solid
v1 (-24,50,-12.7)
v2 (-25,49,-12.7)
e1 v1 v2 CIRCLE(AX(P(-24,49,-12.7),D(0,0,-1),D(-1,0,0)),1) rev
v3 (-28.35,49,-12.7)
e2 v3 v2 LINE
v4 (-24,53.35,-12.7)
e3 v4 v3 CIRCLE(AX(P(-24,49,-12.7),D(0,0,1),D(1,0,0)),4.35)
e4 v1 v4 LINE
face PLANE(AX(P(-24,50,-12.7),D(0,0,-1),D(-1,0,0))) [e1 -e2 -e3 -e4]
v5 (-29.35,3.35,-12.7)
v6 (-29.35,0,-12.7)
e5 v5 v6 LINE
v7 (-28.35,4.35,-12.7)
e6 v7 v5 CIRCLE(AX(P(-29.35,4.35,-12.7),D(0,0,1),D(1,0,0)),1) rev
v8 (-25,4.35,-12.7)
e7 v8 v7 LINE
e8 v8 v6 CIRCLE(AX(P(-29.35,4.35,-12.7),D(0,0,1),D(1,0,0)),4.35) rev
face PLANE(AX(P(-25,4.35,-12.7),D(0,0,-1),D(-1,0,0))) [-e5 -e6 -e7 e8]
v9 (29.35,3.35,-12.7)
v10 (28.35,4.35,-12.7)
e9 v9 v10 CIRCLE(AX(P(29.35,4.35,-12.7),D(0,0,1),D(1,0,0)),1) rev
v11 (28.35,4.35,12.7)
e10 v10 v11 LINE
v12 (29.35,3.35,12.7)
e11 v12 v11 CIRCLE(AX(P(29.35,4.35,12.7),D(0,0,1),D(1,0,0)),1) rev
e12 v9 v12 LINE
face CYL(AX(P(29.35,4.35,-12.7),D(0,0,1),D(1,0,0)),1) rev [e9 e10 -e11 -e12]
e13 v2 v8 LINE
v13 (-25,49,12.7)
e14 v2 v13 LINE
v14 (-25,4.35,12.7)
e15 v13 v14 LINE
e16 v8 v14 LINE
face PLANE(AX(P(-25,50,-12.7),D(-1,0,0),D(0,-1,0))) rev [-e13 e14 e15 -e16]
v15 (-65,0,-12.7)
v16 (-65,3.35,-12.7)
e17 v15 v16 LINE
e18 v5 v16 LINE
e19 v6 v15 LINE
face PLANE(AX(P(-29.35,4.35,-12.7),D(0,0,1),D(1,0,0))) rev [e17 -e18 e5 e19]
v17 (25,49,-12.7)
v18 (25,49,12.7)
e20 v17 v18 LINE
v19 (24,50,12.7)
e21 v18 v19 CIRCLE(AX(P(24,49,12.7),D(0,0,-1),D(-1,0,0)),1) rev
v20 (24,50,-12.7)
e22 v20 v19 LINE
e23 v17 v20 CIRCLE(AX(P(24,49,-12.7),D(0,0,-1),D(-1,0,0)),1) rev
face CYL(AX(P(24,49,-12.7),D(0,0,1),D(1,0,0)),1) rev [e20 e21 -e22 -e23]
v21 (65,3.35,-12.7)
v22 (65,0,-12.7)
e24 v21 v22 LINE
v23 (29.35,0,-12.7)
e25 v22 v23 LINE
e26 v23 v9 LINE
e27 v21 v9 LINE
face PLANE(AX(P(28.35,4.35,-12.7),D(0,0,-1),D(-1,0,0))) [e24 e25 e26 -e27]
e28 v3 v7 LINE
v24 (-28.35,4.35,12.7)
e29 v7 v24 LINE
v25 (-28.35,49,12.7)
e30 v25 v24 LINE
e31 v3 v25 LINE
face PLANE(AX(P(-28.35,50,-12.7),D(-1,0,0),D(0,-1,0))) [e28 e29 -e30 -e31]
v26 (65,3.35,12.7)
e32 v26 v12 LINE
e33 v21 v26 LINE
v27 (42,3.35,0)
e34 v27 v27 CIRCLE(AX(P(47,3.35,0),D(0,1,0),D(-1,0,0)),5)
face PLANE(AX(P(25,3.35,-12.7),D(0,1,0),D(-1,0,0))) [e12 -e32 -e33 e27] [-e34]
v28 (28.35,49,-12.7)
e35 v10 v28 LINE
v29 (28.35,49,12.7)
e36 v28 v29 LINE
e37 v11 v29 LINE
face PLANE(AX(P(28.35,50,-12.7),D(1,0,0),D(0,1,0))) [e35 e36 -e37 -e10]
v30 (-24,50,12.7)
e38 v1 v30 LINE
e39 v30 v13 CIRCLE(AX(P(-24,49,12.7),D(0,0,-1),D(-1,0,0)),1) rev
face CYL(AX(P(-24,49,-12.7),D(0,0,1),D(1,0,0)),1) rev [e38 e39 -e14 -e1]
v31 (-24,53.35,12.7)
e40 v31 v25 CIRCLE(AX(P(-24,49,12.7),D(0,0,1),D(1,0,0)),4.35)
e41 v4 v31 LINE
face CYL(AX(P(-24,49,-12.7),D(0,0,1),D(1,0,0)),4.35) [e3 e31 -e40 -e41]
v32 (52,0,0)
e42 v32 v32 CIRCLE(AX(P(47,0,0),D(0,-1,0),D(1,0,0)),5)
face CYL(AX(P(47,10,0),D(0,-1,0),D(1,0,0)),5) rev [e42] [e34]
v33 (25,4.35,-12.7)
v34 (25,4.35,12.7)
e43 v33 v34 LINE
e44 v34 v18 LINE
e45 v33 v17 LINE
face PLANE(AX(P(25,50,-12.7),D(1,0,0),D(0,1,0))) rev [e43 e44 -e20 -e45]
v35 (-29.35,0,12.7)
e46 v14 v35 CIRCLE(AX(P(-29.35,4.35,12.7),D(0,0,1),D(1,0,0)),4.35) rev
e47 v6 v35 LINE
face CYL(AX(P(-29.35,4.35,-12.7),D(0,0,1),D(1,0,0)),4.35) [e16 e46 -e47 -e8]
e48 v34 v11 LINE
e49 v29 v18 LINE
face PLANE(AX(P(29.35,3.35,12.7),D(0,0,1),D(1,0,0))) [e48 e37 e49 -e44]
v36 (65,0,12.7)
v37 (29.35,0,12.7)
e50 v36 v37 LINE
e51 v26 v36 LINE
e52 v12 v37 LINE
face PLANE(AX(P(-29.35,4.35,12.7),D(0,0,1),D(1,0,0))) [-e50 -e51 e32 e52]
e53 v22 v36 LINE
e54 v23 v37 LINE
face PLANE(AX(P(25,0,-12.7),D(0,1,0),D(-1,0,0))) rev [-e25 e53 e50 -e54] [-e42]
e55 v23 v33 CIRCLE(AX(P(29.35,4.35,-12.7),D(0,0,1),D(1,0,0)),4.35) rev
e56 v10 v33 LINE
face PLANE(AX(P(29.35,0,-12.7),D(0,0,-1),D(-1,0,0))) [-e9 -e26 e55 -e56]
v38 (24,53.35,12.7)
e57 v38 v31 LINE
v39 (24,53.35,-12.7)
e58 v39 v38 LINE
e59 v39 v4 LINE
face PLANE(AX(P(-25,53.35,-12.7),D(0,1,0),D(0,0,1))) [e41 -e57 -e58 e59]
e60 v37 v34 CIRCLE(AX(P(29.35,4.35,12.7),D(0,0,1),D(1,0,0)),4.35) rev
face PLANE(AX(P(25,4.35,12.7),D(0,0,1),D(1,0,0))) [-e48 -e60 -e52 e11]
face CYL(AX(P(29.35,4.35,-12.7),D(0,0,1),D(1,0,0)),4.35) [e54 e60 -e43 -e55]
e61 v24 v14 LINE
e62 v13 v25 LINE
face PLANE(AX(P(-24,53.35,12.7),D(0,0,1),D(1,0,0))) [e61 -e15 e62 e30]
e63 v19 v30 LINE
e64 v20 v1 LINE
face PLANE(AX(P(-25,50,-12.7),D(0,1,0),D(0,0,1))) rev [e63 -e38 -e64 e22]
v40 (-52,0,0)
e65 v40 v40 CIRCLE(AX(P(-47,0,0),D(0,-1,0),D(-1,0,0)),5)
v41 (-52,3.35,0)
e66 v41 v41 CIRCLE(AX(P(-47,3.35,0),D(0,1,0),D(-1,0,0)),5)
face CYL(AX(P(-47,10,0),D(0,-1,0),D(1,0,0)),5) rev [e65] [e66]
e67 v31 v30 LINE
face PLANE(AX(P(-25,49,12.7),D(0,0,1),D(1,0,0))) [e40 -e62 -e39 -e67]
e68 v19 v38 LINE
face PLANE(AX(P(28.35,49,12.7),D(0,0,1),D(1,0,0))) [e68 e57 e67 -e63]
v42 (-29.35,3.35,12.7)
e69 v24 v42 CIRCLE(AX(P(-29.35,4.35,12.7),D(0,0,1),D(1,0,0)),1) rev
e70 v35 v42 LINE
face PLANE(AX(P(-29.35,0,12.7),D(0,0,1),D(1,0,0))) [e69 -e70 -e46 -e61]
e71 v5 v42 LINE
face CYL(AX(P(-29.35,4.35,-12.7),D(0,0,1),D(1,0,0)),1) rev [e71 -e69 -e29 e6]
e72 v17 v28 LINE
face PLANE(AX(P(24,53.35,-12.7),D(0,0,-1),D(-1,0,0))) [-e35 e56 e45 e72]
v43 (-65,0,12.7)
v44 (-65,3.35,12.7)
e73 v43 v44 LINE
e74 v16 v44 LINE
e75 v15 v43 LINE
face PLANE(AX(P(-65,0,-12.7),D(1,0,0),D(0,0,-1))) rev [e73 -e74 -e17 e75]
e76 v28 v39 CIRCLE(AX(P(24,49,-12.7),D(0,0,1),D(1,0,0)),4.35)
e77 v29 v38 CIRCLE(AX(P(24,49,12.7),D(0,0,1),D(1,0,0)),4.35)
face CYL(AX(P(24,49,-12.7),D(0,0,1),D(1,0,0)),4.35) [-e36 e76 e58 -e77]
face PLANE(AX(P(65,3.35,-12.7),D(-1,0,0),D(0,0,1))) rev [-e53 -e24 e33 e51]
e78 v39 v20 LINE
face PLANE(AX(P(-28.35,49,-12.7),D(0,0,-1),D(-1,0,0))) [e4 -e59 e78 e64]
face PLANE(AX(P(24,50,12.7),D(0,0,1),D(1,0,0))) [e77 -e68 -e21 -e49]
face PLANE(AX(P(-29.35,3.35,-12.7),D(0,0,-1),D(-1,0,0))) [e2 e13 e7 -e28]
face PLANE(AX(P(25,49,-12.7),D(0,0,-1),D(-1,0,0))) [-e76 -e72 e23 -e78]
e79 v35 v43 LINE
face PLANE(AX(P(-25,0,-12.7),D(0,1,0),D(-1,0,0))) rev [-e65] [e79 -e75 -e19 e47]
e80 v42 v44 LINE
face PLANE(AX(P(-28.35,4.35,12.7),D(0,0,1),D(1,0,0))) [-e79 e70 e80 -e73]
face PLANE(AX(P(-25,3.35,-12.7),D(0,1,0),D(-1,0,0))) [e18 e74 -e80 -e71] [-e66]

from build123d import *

# Parameters (mm, degrees)
FLANGE_BASE1_DEPTH    = 12.7
ESBO_O3_R             = 5
CORTE_EXTRUS_O1_DEPTH = 10


# Sheet-metal steps are written as plain solids
with BuildPart() as part:
    # Esboço1 → Flange-base1 (new, symmetric)
    with BuildSketch(Plane.XY):
        with BuildLine():
            Line((-65, 0), (-29.35, 0))
            ThreePointArc((-29.35, 0), (-26.274085502, 1.274085502), (-25, 4.35))
            Line((-25, 4.35), (-25, 49))
            ThreePointArc((-25, 49), (-24.707106781, 49.707106781), (-24, 50))
            Line((-24, 50), (24, 50))
            ThreePointArc((24, 50), (24.707106781, 49.707106781), (25, 49))
            Line((25, 49), (25, 4.35))
            ThreePointArc((25, 4.35), (26.274085502, 1.274085502), (29.35, 0))
            Line((29.35, 0), (65, 0))
            Line((65, 0), (65, 3.35))
            Line((65, 3.35), (29.35, 3.35))
            ThreePointArc((29.35, 3.35), (28.642893219, 3.642893219), (28.35, 4.35))
            Line((28.35, 4.35), (28.35, 49))
            ThreePointArc((28.35, 49), (27.075914498, 52.075914498), (24, 53.35))
            Line((24, 53.35), (-24, 53.35))
            ThreePointArc((-24, 53.35), (-27.075914498, 52.075914498), (-28.35, 49))
            Line((-28.35, 49), (-28.35, 4.35))
            ThreePointArc((-28.35, 4.35), (-28.642893219, 3.642893219), (-29.35, 3.35))
            Line((-29.35, 3.35), (-65, 3.35))
            Line((-65, 3.35), (-65, 0))
        make_face()
    extrude(amount=FLANGE_BASE1_DEPTH, both=True)

    # Esboço3 → Corte-extrusão1 (cut)
    with BuildSketch(Plane.XZ):
        with Locations((47, 0)):
            Circle(ESBO_O3_R)
        with Locations(Location((-47, 0, 0), (0, 0, 180))):
            Circle(ESBO_O3_R)
    extrude(amount=-CORTE_EXTRUS_O1_DEPTH, mode=Mode.SUBTRACT)


solid = part.part
